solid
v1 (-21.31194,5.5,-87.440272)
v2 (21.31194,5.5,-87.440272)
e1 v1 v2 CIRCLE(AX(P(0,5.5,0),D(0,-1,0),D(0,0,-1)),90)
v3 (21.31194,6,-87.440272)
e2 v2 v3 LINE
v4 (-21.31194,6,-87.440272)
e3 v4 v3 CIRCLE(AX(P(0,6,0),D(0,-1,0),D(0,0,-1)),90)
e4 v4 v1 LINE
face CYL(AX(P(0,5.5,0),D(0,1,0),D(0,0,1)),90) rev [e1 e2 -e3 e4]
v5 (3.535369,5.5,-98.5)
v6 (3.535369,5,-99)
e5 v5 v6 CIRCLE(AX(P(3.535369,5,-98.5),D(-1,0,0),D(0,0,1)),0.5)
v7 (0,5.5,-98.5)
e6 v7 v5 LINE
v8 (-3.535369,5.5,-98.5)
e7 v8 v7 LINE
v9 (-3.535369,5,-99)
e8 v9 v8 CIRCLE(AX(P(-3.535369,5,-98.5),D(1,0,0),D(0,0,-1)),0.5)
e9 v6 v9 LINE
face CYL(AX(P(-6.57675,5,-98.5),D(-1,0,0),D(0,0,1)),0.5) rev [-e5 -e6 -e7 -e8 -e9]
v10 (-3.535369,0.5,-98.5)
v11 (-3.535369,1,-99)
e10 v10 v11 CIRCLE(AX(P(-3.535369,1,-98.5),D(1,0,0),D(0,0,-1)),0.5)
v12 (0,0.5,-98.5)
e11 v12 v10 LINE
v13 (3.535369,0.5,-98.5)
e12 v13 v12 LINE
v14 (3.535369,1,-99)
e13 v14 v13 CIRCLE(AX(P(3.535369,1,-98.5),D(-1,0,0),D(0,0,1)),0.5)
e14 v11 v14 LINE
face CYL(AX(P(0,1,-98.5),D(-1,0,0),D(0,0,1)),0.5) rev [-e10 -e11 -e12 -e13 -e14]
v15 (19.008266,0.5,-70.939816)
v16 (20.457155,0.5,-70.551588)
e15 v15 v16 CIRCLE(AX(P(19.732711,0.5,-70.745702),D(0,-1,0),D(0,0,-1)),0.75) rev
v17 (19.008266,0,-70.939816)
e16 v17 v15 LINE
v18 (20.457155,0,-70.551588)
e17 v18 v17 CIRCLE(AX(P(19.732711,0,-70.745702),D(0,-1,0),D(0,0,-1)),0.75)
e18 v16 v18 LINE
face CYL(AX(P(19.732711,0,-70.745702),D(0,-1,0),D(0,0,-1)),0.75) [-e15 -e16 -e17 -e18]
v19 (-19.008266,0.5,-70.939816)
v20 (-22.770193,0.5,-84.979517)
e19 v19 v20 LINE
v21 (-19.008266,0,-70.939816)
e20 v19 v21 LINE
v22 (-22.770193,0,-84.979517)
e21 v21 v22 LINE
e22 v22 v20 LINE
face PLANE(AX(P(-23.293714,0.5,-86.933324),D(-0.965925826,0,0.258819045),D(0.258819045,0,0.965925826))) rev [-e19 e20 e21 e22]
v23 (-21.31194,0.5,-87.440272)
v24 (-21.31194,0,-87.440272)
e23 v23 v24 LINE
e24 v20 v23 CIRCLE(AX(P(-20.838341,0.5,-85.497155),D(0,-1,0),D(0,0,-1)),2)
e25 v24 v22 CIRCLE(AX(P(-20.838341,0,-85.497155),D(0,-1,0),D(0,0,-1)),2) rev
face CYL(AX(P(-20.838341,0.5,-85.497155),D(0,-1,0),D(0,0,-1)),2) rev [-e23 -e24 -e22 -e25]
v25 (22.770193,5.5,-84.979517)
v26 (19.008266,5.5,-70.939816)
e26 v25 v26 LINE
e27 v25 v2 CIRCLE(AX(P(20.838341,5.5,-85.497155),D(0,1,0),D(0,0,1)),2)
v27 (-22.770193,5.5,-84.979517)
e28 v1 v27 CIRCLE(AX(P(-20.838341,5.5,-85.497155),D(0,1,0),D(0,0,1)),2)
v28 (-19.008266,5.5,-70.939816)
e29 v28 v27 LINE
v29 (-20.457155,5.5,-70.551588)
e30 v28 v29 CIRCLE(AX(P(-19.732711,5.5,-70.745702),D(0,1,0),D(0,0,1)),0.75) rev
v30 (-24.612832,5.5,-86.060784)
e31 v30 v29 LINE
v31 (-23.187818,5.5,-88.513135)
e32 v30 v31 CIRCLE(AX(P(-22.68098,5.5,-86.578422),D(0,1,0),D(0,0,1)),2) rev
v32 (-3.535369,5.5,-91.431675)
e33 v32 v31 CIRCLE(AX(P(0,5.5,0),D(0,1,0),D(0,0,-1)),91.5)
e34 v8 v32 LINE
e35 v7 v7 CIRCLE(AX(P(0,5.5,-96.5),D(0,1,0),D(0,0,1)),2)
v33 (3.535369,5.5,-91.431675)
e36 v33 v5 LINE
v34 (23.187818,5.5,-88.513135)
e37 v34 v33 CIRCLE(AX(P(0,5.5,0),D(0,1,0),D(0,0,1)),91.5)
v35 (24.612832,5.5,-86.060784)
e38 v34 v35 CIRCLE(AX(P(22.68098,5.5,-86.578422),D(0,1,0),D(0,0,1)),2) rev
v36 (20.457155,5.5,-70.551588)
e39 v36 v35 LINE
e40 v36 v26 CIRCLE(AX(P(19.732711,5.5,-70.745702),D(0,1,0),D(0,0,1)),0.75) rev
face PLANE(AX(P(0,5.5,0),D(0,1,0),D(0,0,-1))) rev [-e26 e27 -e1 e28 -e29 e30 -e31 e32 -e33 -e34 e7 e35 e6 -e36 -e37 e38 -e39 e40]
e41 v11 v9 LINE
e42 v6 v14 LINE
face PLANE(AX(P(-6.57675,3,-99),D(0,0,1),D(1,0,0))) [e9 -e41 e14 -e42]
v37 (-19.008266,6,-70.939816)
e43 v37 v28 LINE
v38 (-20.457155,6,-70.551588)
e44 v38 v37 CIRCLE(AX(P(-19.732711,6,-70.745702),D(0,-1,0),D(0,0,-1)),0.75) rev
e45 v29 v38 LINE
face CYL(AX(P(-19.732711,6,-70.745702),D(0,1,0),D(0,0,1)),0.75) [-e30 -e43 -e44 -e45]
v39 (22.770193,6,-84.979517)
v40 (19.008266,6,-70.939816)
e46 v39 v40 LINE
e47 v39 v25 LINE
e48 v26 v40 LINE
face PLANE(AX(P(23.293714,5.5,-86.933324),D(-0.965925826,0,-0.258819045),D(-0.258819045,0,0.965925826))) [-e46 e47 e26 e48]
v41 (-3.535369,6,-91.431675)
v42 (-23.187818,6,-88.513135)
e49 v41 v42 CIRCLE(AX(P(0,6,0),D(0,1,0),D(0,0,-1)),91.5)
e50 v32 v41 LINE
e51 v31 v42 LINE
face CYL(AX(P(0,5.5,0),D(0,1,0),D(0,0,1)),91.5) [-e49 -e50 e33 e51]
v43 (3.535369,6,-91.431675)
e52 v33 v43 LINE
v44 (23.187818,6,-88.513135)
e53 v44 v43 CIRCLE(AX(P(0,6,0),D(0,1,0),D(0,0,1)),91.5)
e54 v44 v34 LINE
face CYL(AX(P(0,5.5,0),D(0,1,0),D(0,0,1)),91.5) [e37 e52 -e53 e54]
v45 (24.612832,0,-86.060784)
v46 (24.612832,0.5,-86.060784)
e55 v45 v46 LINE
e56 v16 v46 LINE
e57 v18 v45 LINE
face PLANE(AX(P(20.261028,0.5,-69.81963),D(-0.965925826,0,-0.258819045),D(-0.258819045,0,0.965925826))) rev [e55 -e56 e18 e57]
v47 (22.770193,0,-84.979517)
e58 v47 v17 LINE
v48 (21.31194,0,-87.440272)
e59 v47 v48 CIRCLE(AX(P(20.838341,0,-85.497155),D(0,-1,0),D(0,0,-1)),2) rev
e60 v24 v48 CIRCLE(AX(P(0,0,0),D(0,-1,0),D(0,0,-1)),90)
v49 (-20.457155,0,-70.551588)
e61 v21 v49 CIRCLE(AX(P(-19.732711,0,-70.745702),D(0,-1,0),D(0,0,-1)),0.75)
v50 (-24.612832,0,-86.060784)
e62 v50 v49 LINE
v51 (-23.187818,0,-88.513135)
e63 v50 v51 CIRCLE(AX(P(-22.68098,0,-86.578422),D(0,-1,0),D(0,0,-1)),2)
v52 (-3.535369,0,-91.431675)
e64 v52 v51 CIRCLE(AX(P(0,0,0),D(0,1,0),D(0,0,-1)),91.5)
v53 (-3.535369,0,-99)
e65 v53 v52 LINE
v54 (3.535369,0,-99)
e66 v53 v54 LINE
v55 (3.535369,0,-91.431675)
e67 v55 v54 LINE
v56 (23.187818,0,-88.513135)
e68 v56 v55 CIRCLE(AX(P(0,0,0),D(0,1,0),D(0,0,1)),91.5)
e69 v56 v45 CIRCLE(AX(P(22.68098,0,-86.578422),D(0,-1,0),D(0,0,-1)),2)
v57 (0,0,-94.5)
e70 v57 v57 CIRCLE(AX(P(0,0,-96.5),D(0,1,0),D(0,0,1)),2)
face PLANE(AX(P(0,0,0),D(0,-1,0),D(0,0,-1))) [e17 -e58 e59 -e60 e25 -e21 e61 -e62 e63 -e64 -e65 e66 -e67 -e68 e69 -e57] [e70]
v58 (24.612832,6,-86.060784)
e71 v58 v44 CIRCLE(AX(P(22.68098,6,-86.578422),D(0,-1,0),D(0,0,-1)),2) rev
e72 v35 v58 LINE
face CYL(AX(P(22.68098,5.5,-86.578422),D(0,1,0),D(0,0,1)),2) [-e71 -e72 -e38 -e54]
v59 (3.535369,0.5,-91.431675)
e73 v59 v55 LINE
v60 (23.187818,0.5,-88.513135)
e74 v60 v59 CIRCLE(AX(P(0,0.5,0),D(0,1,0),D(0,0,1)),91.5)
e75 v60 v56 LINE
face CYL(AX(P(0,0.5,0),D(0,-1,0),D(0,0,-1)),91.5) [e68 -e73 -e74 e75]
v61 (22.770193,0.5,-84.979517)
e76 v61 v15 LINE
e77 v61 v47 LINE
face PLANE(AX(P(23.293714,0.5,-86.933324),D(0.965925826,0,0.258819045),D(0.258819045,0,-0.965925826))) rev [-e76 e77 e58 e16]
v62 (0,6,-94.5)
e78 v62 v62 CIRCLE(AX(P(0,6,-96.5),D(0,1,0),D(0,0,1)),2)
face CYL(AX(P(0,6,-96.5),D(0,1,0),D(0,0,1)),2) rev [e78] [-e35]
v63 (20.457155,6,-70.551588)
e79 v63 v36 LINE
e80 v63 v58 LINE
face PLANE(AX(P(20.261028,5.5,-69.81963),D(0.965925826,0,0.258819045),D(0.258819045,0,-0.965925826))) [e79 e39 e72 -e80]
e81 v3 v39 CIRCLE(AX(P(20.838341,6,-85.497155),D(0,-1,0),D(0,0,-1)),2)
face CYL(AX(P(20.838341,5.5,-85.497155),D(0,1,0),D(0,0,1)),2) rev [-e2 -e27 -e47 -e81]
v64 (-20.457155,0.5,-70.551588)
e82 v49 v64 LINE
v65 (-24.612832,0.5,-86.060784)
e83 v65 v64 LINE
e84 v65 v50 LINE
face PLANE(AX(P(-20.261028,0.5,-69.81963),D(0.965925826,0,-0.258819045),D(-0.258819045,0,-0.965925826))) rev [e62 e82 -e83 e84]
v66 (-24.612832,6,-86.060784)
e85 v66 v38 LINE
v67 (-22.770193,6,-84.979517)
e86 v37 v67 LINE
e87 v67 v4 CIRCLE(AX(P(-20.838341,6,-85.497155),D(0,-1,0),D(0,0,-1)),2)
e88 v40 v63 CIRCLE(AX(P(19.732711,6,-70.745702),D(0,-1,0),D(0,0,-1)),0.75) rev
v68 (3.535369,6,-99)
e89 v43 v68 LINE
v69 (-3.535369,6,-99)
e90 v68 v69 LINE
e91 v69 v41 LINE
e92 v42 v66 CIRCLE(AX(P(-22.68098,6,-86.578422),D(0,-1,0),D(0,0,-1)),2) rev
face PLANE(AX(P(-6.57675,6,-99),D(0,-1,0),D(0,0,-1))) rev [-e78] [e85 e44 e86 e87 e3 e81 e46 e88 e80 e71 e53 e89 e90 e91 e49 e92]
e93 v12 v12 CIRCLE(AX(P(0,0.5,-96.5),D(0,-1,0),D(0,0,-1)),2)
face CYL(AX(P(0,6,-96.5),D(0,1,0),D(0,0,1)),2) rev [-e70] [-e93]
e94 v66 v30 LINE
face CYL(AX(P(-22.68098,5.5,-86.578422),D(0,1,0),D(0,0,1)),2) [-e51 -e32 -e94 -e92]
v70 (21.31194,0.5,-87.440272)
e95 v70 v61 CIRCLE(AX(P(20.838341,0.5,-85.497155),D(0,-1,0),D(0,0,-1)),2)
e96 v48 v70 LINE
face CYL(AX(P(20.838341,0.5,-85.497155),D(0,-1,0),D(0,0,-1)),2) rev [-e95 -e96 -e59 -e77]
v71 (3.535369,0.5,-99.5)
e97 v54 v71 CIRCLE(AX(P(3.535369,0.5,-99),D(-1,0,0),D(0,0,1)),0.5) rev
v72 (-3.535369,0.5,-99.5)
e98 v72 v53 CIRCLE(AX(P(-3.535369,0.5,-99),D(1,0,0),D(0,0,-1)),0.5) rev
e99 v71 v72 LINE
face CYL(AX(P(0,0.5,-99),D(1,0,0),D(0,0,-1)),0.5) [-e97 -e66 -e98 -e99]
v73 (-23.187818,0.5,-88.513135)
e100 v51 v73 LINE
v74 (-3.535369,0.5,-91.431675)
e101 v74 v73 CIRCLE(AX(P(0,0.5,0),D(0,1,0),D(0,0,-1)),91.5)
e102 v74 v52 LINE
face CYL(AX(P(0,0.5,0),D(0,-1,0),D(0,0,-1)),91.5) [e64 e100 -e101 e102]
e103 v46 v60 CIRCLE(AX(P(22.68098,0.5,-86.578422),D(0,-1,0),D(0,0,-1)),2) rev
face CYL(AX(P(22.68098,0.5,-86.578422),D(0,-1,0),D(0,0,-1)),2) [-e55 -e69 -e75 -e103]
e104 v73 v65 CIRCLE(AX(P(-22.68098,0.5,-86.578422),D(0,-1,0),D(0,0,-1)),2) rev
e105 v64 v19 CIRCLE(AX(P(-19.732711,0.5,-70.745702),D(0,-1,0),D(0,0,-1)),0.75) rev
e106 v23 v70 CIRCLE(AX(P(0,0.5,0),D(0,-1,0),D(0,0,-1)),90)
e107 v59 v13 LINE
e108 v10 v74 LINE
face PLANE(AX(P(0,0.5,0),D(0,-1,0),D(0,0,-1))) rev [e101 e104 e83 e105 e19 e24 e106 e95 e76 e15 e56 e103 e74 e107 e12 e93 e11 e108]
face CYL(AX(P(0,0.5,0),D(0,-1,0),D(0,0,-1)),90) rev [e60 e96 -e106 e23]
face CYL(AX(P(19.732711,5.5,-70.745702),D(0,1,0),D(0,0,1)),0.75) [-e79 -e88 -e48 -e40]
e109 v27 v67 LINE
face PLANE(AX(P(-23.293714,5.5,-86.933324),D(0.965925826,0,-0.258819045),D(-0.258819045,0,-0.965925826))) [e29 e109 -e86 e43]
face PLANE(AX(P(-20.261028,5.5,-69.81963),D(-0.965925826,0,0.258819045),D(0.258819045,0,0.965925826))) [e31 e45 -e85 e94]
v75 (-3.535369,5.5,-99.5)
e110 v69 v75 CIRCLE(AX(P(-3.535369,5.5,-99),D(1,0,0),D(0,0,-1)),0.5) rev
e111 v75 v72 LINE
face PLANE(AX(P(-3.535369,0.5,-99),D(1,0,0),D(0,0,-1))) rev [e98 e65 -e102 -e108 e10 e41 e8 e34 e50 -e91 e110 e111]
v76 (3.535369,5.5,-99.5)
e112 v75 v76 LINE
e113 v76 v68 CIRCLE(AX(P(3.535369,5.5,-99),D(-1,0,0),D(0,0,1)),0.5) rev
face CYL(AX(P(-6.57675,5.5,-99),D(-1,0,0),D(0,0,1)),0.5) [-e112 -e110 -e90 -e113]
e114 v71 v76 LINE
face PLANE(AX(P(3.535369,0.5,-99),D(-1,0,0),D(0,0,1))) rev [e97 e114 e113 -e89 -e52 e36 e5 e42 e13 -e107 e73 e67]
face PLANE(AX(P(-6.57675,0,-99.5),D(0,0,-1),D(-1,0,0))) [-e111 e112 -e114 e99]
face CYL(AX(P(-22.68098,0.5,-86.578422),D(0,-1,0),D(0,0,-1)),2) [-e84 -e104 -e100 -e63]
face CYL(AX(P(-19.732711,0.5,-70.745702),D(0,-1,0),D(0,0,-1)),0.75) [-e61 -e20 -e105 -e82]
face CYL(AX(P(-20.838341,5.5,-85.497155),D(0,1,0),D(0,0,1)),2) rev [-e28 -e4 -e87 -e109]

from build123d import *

# Parameters (mm, degrees)
BOSS_EXTRUDE1_DEPTH   = 0.5
FILLET3_R             = 2
FILLET4_R             = 0.75
FILLET5_R             = 0.75
SKETCH2_W             = 0.5
SKETCH2_H             = 3
BOSS_EXTRUDE2_DEPTH   = 7.070737889
FILLET3_OF_MIRROR5_R  = 2
FILLET4_OF_MIRROR5_R  = 0.75
FILLET5_OF_MIRROR5_R  = 0.75
FILLET7_R             = 0.5
F_4_0MM_DOWEL_HOLE1_D = 4


with BuildPart() as part:
    # Sketch1 → Boss-Extrude1 (new body)
    with BuildSketch(Plane(origin=(0, 0, 0), x_dir=(1, 0, 0), z_dir=(0, 1, 0))):
        with BuildLine():
            Line((23.293714059, 86.933324366), (18.816144579, 70.222807571))
            Line((18.816144579, 70.222807571), (20.261027783, 69.819630142))
            Line((20.261027783, 69.819630142), (25.127648951, 87.982107603))
            ThreePointArc((25.127648951, 87.982107603), (14.434923875, 90.354208384), (3.535368944, 91.431674853))
            Line((3.535368944, 91.431674853), (3.535368944, 99))
            Line((3.535368944, 99), (-3.535368944, 99))
            Line((-3.535368944, 99), (-3.535368944, 91.431674853))
            ThreePointArc((-3.535368944, 91.431674853), (-14.434923875, 90.354208384), (-25.127648951, 87.982107603))
            Line((-25.127648951, 87.982107603), (-20.261027783, 69.819630142))
            Line((-20.261027783, 69.819630142), (-18.816144579, 70.222807571))
            Line((-18.816144579, 70.222807571), (-23.293714059, 86.933324366))
            ThreePointArc((-23.293714059, 86.933324366), (0, 90), (23.293714059, 86.933324366))
        make_face()
    boss_extrude1 = extrude(amount=BOSS_EXTRUDE1_DEPTH)

    # Fillet3
    fillet3_edges = [part.edges().sort_by_distance(p)[0] for p in [
        (-23.293714059, 0.25, -86.933324366),
        (-25.127648951, 0.25, -87.982107603),
        (25.127648951, 0.25, -87.982107603),
        (23.293714059, 0.25, -86.933324366),
    ]]
    fillet(fillet3_edges, radius=FILLET3_R)

    # Fillet4
    fillet4_edges = [part.edges().sort_by_distance(p)[0] for p in [
        (-18.816144579, 0.25, -70.222807571),
        (-20.261027783, 0.25, -69.819630142),
    ]]
    fillet(fillet4_edges, radius=FILLET4_R - 0.0001)  # a hair under: the kernel refuses the full size

    # Fillet5
    fillet5_edges = [part.edges().sort_by_distance(p)[0] for p in [
        (20.261027783, 0.25, -69.819630142),
        (18.816144579, 0.25, -70.222807571),
    ]]
    fillet(fillet5_edges, radius=FILLET5_R - 0.0001)  # a hair under: the kernel refuses the full size

    # Sketch2 → Boss-Extrude2 (add)
    with BuildSketch(Plane(origin=(3.535368944, 0, 0), x_dir=(0, 0, -1), z_dir=(1, 0, 0))):
        with Locations((99.25, 1.5)):
            Rectangle(SKETCH2_W, SKETCH2_H)
    boss_extrude2 = extrude(amount=-BOSS_EXTRUDE2_DEPTH)

    # Mirror3: Boss-Extrude2 across plane
    add(boss_extrude2.mirror(Plane.ZX.offset(3)))

    # Mirror5: Boss-Extrude1 across plane
    add(boss_extrude1.mirror(Plane.ZX.offset(3)))

    # Fillet3 of Mirror5
    fillet3_of_mirror5_edges = [part.edges().sort_by_distance(p)[0] for p in [
        (-23.293714059, 5.75, -86.933324366),
        (-25.127648951, 5.75, -87.982107603),
        (25.127648951, 5.75, -87.982107603),
        (23.293714059, 5.75, -86.933324366),
    ]]
    fillet(fillet3_of_mirror5_edges, radius=FILLET3_OF_MIRROR5_R)

    # Fillet4 of Mirror5
    fillet4_of_mirror5_edges = [part.edges().sort_by_distance(p)[0] for p in [
        (-18.816144579, 5.75, -70.222807571),
        (-20.261027783, 5.75, -69.819630142),
    ]]
    fillet(fillet4_of_mirror5_edges, radius=FILLET4_OF_MIRROR5_R - 0.0001)  # a hair under: the kernel refuses the full size

    # Fillet5 of Mirror5
    fillet5_of_mirror5_edges = [part.edges().sort_by_distance(p)[0] for p in [
        (20.261027783, 5.75, -69.819630142),
        (18.816144579, 5.75, -70.222807571),
    ]]
    fillet(fillet5_of_mirror5_edges, radius=FILLET5_OF_MIRROR5_R - 0.0001)  # a hair under: the kernel refuses the full size

    # Fillet7
    fillet7_edges = [part.edges().sort_by_distance(p)[0] for p in [
        (0, 5.5, -99),
        (0, 0.5, -99),
        (0, 0, -99.5),
        (0, 6, -99.5),
    ]]
    fillet(fillet7_edges, radius=FILLET7_R)

    # Ø4.0mm Dowel Hole1 (through all)
    with Locations(Plane(origin=(0, 6, 0), x_dir=(1, 0, 0), z_dir=(0, 1, 0))):
        with Locations((0, 96.5)):
            Hole(F_4_0MM_DOWEL_HOLE1_D / 2)


solid = part.part
